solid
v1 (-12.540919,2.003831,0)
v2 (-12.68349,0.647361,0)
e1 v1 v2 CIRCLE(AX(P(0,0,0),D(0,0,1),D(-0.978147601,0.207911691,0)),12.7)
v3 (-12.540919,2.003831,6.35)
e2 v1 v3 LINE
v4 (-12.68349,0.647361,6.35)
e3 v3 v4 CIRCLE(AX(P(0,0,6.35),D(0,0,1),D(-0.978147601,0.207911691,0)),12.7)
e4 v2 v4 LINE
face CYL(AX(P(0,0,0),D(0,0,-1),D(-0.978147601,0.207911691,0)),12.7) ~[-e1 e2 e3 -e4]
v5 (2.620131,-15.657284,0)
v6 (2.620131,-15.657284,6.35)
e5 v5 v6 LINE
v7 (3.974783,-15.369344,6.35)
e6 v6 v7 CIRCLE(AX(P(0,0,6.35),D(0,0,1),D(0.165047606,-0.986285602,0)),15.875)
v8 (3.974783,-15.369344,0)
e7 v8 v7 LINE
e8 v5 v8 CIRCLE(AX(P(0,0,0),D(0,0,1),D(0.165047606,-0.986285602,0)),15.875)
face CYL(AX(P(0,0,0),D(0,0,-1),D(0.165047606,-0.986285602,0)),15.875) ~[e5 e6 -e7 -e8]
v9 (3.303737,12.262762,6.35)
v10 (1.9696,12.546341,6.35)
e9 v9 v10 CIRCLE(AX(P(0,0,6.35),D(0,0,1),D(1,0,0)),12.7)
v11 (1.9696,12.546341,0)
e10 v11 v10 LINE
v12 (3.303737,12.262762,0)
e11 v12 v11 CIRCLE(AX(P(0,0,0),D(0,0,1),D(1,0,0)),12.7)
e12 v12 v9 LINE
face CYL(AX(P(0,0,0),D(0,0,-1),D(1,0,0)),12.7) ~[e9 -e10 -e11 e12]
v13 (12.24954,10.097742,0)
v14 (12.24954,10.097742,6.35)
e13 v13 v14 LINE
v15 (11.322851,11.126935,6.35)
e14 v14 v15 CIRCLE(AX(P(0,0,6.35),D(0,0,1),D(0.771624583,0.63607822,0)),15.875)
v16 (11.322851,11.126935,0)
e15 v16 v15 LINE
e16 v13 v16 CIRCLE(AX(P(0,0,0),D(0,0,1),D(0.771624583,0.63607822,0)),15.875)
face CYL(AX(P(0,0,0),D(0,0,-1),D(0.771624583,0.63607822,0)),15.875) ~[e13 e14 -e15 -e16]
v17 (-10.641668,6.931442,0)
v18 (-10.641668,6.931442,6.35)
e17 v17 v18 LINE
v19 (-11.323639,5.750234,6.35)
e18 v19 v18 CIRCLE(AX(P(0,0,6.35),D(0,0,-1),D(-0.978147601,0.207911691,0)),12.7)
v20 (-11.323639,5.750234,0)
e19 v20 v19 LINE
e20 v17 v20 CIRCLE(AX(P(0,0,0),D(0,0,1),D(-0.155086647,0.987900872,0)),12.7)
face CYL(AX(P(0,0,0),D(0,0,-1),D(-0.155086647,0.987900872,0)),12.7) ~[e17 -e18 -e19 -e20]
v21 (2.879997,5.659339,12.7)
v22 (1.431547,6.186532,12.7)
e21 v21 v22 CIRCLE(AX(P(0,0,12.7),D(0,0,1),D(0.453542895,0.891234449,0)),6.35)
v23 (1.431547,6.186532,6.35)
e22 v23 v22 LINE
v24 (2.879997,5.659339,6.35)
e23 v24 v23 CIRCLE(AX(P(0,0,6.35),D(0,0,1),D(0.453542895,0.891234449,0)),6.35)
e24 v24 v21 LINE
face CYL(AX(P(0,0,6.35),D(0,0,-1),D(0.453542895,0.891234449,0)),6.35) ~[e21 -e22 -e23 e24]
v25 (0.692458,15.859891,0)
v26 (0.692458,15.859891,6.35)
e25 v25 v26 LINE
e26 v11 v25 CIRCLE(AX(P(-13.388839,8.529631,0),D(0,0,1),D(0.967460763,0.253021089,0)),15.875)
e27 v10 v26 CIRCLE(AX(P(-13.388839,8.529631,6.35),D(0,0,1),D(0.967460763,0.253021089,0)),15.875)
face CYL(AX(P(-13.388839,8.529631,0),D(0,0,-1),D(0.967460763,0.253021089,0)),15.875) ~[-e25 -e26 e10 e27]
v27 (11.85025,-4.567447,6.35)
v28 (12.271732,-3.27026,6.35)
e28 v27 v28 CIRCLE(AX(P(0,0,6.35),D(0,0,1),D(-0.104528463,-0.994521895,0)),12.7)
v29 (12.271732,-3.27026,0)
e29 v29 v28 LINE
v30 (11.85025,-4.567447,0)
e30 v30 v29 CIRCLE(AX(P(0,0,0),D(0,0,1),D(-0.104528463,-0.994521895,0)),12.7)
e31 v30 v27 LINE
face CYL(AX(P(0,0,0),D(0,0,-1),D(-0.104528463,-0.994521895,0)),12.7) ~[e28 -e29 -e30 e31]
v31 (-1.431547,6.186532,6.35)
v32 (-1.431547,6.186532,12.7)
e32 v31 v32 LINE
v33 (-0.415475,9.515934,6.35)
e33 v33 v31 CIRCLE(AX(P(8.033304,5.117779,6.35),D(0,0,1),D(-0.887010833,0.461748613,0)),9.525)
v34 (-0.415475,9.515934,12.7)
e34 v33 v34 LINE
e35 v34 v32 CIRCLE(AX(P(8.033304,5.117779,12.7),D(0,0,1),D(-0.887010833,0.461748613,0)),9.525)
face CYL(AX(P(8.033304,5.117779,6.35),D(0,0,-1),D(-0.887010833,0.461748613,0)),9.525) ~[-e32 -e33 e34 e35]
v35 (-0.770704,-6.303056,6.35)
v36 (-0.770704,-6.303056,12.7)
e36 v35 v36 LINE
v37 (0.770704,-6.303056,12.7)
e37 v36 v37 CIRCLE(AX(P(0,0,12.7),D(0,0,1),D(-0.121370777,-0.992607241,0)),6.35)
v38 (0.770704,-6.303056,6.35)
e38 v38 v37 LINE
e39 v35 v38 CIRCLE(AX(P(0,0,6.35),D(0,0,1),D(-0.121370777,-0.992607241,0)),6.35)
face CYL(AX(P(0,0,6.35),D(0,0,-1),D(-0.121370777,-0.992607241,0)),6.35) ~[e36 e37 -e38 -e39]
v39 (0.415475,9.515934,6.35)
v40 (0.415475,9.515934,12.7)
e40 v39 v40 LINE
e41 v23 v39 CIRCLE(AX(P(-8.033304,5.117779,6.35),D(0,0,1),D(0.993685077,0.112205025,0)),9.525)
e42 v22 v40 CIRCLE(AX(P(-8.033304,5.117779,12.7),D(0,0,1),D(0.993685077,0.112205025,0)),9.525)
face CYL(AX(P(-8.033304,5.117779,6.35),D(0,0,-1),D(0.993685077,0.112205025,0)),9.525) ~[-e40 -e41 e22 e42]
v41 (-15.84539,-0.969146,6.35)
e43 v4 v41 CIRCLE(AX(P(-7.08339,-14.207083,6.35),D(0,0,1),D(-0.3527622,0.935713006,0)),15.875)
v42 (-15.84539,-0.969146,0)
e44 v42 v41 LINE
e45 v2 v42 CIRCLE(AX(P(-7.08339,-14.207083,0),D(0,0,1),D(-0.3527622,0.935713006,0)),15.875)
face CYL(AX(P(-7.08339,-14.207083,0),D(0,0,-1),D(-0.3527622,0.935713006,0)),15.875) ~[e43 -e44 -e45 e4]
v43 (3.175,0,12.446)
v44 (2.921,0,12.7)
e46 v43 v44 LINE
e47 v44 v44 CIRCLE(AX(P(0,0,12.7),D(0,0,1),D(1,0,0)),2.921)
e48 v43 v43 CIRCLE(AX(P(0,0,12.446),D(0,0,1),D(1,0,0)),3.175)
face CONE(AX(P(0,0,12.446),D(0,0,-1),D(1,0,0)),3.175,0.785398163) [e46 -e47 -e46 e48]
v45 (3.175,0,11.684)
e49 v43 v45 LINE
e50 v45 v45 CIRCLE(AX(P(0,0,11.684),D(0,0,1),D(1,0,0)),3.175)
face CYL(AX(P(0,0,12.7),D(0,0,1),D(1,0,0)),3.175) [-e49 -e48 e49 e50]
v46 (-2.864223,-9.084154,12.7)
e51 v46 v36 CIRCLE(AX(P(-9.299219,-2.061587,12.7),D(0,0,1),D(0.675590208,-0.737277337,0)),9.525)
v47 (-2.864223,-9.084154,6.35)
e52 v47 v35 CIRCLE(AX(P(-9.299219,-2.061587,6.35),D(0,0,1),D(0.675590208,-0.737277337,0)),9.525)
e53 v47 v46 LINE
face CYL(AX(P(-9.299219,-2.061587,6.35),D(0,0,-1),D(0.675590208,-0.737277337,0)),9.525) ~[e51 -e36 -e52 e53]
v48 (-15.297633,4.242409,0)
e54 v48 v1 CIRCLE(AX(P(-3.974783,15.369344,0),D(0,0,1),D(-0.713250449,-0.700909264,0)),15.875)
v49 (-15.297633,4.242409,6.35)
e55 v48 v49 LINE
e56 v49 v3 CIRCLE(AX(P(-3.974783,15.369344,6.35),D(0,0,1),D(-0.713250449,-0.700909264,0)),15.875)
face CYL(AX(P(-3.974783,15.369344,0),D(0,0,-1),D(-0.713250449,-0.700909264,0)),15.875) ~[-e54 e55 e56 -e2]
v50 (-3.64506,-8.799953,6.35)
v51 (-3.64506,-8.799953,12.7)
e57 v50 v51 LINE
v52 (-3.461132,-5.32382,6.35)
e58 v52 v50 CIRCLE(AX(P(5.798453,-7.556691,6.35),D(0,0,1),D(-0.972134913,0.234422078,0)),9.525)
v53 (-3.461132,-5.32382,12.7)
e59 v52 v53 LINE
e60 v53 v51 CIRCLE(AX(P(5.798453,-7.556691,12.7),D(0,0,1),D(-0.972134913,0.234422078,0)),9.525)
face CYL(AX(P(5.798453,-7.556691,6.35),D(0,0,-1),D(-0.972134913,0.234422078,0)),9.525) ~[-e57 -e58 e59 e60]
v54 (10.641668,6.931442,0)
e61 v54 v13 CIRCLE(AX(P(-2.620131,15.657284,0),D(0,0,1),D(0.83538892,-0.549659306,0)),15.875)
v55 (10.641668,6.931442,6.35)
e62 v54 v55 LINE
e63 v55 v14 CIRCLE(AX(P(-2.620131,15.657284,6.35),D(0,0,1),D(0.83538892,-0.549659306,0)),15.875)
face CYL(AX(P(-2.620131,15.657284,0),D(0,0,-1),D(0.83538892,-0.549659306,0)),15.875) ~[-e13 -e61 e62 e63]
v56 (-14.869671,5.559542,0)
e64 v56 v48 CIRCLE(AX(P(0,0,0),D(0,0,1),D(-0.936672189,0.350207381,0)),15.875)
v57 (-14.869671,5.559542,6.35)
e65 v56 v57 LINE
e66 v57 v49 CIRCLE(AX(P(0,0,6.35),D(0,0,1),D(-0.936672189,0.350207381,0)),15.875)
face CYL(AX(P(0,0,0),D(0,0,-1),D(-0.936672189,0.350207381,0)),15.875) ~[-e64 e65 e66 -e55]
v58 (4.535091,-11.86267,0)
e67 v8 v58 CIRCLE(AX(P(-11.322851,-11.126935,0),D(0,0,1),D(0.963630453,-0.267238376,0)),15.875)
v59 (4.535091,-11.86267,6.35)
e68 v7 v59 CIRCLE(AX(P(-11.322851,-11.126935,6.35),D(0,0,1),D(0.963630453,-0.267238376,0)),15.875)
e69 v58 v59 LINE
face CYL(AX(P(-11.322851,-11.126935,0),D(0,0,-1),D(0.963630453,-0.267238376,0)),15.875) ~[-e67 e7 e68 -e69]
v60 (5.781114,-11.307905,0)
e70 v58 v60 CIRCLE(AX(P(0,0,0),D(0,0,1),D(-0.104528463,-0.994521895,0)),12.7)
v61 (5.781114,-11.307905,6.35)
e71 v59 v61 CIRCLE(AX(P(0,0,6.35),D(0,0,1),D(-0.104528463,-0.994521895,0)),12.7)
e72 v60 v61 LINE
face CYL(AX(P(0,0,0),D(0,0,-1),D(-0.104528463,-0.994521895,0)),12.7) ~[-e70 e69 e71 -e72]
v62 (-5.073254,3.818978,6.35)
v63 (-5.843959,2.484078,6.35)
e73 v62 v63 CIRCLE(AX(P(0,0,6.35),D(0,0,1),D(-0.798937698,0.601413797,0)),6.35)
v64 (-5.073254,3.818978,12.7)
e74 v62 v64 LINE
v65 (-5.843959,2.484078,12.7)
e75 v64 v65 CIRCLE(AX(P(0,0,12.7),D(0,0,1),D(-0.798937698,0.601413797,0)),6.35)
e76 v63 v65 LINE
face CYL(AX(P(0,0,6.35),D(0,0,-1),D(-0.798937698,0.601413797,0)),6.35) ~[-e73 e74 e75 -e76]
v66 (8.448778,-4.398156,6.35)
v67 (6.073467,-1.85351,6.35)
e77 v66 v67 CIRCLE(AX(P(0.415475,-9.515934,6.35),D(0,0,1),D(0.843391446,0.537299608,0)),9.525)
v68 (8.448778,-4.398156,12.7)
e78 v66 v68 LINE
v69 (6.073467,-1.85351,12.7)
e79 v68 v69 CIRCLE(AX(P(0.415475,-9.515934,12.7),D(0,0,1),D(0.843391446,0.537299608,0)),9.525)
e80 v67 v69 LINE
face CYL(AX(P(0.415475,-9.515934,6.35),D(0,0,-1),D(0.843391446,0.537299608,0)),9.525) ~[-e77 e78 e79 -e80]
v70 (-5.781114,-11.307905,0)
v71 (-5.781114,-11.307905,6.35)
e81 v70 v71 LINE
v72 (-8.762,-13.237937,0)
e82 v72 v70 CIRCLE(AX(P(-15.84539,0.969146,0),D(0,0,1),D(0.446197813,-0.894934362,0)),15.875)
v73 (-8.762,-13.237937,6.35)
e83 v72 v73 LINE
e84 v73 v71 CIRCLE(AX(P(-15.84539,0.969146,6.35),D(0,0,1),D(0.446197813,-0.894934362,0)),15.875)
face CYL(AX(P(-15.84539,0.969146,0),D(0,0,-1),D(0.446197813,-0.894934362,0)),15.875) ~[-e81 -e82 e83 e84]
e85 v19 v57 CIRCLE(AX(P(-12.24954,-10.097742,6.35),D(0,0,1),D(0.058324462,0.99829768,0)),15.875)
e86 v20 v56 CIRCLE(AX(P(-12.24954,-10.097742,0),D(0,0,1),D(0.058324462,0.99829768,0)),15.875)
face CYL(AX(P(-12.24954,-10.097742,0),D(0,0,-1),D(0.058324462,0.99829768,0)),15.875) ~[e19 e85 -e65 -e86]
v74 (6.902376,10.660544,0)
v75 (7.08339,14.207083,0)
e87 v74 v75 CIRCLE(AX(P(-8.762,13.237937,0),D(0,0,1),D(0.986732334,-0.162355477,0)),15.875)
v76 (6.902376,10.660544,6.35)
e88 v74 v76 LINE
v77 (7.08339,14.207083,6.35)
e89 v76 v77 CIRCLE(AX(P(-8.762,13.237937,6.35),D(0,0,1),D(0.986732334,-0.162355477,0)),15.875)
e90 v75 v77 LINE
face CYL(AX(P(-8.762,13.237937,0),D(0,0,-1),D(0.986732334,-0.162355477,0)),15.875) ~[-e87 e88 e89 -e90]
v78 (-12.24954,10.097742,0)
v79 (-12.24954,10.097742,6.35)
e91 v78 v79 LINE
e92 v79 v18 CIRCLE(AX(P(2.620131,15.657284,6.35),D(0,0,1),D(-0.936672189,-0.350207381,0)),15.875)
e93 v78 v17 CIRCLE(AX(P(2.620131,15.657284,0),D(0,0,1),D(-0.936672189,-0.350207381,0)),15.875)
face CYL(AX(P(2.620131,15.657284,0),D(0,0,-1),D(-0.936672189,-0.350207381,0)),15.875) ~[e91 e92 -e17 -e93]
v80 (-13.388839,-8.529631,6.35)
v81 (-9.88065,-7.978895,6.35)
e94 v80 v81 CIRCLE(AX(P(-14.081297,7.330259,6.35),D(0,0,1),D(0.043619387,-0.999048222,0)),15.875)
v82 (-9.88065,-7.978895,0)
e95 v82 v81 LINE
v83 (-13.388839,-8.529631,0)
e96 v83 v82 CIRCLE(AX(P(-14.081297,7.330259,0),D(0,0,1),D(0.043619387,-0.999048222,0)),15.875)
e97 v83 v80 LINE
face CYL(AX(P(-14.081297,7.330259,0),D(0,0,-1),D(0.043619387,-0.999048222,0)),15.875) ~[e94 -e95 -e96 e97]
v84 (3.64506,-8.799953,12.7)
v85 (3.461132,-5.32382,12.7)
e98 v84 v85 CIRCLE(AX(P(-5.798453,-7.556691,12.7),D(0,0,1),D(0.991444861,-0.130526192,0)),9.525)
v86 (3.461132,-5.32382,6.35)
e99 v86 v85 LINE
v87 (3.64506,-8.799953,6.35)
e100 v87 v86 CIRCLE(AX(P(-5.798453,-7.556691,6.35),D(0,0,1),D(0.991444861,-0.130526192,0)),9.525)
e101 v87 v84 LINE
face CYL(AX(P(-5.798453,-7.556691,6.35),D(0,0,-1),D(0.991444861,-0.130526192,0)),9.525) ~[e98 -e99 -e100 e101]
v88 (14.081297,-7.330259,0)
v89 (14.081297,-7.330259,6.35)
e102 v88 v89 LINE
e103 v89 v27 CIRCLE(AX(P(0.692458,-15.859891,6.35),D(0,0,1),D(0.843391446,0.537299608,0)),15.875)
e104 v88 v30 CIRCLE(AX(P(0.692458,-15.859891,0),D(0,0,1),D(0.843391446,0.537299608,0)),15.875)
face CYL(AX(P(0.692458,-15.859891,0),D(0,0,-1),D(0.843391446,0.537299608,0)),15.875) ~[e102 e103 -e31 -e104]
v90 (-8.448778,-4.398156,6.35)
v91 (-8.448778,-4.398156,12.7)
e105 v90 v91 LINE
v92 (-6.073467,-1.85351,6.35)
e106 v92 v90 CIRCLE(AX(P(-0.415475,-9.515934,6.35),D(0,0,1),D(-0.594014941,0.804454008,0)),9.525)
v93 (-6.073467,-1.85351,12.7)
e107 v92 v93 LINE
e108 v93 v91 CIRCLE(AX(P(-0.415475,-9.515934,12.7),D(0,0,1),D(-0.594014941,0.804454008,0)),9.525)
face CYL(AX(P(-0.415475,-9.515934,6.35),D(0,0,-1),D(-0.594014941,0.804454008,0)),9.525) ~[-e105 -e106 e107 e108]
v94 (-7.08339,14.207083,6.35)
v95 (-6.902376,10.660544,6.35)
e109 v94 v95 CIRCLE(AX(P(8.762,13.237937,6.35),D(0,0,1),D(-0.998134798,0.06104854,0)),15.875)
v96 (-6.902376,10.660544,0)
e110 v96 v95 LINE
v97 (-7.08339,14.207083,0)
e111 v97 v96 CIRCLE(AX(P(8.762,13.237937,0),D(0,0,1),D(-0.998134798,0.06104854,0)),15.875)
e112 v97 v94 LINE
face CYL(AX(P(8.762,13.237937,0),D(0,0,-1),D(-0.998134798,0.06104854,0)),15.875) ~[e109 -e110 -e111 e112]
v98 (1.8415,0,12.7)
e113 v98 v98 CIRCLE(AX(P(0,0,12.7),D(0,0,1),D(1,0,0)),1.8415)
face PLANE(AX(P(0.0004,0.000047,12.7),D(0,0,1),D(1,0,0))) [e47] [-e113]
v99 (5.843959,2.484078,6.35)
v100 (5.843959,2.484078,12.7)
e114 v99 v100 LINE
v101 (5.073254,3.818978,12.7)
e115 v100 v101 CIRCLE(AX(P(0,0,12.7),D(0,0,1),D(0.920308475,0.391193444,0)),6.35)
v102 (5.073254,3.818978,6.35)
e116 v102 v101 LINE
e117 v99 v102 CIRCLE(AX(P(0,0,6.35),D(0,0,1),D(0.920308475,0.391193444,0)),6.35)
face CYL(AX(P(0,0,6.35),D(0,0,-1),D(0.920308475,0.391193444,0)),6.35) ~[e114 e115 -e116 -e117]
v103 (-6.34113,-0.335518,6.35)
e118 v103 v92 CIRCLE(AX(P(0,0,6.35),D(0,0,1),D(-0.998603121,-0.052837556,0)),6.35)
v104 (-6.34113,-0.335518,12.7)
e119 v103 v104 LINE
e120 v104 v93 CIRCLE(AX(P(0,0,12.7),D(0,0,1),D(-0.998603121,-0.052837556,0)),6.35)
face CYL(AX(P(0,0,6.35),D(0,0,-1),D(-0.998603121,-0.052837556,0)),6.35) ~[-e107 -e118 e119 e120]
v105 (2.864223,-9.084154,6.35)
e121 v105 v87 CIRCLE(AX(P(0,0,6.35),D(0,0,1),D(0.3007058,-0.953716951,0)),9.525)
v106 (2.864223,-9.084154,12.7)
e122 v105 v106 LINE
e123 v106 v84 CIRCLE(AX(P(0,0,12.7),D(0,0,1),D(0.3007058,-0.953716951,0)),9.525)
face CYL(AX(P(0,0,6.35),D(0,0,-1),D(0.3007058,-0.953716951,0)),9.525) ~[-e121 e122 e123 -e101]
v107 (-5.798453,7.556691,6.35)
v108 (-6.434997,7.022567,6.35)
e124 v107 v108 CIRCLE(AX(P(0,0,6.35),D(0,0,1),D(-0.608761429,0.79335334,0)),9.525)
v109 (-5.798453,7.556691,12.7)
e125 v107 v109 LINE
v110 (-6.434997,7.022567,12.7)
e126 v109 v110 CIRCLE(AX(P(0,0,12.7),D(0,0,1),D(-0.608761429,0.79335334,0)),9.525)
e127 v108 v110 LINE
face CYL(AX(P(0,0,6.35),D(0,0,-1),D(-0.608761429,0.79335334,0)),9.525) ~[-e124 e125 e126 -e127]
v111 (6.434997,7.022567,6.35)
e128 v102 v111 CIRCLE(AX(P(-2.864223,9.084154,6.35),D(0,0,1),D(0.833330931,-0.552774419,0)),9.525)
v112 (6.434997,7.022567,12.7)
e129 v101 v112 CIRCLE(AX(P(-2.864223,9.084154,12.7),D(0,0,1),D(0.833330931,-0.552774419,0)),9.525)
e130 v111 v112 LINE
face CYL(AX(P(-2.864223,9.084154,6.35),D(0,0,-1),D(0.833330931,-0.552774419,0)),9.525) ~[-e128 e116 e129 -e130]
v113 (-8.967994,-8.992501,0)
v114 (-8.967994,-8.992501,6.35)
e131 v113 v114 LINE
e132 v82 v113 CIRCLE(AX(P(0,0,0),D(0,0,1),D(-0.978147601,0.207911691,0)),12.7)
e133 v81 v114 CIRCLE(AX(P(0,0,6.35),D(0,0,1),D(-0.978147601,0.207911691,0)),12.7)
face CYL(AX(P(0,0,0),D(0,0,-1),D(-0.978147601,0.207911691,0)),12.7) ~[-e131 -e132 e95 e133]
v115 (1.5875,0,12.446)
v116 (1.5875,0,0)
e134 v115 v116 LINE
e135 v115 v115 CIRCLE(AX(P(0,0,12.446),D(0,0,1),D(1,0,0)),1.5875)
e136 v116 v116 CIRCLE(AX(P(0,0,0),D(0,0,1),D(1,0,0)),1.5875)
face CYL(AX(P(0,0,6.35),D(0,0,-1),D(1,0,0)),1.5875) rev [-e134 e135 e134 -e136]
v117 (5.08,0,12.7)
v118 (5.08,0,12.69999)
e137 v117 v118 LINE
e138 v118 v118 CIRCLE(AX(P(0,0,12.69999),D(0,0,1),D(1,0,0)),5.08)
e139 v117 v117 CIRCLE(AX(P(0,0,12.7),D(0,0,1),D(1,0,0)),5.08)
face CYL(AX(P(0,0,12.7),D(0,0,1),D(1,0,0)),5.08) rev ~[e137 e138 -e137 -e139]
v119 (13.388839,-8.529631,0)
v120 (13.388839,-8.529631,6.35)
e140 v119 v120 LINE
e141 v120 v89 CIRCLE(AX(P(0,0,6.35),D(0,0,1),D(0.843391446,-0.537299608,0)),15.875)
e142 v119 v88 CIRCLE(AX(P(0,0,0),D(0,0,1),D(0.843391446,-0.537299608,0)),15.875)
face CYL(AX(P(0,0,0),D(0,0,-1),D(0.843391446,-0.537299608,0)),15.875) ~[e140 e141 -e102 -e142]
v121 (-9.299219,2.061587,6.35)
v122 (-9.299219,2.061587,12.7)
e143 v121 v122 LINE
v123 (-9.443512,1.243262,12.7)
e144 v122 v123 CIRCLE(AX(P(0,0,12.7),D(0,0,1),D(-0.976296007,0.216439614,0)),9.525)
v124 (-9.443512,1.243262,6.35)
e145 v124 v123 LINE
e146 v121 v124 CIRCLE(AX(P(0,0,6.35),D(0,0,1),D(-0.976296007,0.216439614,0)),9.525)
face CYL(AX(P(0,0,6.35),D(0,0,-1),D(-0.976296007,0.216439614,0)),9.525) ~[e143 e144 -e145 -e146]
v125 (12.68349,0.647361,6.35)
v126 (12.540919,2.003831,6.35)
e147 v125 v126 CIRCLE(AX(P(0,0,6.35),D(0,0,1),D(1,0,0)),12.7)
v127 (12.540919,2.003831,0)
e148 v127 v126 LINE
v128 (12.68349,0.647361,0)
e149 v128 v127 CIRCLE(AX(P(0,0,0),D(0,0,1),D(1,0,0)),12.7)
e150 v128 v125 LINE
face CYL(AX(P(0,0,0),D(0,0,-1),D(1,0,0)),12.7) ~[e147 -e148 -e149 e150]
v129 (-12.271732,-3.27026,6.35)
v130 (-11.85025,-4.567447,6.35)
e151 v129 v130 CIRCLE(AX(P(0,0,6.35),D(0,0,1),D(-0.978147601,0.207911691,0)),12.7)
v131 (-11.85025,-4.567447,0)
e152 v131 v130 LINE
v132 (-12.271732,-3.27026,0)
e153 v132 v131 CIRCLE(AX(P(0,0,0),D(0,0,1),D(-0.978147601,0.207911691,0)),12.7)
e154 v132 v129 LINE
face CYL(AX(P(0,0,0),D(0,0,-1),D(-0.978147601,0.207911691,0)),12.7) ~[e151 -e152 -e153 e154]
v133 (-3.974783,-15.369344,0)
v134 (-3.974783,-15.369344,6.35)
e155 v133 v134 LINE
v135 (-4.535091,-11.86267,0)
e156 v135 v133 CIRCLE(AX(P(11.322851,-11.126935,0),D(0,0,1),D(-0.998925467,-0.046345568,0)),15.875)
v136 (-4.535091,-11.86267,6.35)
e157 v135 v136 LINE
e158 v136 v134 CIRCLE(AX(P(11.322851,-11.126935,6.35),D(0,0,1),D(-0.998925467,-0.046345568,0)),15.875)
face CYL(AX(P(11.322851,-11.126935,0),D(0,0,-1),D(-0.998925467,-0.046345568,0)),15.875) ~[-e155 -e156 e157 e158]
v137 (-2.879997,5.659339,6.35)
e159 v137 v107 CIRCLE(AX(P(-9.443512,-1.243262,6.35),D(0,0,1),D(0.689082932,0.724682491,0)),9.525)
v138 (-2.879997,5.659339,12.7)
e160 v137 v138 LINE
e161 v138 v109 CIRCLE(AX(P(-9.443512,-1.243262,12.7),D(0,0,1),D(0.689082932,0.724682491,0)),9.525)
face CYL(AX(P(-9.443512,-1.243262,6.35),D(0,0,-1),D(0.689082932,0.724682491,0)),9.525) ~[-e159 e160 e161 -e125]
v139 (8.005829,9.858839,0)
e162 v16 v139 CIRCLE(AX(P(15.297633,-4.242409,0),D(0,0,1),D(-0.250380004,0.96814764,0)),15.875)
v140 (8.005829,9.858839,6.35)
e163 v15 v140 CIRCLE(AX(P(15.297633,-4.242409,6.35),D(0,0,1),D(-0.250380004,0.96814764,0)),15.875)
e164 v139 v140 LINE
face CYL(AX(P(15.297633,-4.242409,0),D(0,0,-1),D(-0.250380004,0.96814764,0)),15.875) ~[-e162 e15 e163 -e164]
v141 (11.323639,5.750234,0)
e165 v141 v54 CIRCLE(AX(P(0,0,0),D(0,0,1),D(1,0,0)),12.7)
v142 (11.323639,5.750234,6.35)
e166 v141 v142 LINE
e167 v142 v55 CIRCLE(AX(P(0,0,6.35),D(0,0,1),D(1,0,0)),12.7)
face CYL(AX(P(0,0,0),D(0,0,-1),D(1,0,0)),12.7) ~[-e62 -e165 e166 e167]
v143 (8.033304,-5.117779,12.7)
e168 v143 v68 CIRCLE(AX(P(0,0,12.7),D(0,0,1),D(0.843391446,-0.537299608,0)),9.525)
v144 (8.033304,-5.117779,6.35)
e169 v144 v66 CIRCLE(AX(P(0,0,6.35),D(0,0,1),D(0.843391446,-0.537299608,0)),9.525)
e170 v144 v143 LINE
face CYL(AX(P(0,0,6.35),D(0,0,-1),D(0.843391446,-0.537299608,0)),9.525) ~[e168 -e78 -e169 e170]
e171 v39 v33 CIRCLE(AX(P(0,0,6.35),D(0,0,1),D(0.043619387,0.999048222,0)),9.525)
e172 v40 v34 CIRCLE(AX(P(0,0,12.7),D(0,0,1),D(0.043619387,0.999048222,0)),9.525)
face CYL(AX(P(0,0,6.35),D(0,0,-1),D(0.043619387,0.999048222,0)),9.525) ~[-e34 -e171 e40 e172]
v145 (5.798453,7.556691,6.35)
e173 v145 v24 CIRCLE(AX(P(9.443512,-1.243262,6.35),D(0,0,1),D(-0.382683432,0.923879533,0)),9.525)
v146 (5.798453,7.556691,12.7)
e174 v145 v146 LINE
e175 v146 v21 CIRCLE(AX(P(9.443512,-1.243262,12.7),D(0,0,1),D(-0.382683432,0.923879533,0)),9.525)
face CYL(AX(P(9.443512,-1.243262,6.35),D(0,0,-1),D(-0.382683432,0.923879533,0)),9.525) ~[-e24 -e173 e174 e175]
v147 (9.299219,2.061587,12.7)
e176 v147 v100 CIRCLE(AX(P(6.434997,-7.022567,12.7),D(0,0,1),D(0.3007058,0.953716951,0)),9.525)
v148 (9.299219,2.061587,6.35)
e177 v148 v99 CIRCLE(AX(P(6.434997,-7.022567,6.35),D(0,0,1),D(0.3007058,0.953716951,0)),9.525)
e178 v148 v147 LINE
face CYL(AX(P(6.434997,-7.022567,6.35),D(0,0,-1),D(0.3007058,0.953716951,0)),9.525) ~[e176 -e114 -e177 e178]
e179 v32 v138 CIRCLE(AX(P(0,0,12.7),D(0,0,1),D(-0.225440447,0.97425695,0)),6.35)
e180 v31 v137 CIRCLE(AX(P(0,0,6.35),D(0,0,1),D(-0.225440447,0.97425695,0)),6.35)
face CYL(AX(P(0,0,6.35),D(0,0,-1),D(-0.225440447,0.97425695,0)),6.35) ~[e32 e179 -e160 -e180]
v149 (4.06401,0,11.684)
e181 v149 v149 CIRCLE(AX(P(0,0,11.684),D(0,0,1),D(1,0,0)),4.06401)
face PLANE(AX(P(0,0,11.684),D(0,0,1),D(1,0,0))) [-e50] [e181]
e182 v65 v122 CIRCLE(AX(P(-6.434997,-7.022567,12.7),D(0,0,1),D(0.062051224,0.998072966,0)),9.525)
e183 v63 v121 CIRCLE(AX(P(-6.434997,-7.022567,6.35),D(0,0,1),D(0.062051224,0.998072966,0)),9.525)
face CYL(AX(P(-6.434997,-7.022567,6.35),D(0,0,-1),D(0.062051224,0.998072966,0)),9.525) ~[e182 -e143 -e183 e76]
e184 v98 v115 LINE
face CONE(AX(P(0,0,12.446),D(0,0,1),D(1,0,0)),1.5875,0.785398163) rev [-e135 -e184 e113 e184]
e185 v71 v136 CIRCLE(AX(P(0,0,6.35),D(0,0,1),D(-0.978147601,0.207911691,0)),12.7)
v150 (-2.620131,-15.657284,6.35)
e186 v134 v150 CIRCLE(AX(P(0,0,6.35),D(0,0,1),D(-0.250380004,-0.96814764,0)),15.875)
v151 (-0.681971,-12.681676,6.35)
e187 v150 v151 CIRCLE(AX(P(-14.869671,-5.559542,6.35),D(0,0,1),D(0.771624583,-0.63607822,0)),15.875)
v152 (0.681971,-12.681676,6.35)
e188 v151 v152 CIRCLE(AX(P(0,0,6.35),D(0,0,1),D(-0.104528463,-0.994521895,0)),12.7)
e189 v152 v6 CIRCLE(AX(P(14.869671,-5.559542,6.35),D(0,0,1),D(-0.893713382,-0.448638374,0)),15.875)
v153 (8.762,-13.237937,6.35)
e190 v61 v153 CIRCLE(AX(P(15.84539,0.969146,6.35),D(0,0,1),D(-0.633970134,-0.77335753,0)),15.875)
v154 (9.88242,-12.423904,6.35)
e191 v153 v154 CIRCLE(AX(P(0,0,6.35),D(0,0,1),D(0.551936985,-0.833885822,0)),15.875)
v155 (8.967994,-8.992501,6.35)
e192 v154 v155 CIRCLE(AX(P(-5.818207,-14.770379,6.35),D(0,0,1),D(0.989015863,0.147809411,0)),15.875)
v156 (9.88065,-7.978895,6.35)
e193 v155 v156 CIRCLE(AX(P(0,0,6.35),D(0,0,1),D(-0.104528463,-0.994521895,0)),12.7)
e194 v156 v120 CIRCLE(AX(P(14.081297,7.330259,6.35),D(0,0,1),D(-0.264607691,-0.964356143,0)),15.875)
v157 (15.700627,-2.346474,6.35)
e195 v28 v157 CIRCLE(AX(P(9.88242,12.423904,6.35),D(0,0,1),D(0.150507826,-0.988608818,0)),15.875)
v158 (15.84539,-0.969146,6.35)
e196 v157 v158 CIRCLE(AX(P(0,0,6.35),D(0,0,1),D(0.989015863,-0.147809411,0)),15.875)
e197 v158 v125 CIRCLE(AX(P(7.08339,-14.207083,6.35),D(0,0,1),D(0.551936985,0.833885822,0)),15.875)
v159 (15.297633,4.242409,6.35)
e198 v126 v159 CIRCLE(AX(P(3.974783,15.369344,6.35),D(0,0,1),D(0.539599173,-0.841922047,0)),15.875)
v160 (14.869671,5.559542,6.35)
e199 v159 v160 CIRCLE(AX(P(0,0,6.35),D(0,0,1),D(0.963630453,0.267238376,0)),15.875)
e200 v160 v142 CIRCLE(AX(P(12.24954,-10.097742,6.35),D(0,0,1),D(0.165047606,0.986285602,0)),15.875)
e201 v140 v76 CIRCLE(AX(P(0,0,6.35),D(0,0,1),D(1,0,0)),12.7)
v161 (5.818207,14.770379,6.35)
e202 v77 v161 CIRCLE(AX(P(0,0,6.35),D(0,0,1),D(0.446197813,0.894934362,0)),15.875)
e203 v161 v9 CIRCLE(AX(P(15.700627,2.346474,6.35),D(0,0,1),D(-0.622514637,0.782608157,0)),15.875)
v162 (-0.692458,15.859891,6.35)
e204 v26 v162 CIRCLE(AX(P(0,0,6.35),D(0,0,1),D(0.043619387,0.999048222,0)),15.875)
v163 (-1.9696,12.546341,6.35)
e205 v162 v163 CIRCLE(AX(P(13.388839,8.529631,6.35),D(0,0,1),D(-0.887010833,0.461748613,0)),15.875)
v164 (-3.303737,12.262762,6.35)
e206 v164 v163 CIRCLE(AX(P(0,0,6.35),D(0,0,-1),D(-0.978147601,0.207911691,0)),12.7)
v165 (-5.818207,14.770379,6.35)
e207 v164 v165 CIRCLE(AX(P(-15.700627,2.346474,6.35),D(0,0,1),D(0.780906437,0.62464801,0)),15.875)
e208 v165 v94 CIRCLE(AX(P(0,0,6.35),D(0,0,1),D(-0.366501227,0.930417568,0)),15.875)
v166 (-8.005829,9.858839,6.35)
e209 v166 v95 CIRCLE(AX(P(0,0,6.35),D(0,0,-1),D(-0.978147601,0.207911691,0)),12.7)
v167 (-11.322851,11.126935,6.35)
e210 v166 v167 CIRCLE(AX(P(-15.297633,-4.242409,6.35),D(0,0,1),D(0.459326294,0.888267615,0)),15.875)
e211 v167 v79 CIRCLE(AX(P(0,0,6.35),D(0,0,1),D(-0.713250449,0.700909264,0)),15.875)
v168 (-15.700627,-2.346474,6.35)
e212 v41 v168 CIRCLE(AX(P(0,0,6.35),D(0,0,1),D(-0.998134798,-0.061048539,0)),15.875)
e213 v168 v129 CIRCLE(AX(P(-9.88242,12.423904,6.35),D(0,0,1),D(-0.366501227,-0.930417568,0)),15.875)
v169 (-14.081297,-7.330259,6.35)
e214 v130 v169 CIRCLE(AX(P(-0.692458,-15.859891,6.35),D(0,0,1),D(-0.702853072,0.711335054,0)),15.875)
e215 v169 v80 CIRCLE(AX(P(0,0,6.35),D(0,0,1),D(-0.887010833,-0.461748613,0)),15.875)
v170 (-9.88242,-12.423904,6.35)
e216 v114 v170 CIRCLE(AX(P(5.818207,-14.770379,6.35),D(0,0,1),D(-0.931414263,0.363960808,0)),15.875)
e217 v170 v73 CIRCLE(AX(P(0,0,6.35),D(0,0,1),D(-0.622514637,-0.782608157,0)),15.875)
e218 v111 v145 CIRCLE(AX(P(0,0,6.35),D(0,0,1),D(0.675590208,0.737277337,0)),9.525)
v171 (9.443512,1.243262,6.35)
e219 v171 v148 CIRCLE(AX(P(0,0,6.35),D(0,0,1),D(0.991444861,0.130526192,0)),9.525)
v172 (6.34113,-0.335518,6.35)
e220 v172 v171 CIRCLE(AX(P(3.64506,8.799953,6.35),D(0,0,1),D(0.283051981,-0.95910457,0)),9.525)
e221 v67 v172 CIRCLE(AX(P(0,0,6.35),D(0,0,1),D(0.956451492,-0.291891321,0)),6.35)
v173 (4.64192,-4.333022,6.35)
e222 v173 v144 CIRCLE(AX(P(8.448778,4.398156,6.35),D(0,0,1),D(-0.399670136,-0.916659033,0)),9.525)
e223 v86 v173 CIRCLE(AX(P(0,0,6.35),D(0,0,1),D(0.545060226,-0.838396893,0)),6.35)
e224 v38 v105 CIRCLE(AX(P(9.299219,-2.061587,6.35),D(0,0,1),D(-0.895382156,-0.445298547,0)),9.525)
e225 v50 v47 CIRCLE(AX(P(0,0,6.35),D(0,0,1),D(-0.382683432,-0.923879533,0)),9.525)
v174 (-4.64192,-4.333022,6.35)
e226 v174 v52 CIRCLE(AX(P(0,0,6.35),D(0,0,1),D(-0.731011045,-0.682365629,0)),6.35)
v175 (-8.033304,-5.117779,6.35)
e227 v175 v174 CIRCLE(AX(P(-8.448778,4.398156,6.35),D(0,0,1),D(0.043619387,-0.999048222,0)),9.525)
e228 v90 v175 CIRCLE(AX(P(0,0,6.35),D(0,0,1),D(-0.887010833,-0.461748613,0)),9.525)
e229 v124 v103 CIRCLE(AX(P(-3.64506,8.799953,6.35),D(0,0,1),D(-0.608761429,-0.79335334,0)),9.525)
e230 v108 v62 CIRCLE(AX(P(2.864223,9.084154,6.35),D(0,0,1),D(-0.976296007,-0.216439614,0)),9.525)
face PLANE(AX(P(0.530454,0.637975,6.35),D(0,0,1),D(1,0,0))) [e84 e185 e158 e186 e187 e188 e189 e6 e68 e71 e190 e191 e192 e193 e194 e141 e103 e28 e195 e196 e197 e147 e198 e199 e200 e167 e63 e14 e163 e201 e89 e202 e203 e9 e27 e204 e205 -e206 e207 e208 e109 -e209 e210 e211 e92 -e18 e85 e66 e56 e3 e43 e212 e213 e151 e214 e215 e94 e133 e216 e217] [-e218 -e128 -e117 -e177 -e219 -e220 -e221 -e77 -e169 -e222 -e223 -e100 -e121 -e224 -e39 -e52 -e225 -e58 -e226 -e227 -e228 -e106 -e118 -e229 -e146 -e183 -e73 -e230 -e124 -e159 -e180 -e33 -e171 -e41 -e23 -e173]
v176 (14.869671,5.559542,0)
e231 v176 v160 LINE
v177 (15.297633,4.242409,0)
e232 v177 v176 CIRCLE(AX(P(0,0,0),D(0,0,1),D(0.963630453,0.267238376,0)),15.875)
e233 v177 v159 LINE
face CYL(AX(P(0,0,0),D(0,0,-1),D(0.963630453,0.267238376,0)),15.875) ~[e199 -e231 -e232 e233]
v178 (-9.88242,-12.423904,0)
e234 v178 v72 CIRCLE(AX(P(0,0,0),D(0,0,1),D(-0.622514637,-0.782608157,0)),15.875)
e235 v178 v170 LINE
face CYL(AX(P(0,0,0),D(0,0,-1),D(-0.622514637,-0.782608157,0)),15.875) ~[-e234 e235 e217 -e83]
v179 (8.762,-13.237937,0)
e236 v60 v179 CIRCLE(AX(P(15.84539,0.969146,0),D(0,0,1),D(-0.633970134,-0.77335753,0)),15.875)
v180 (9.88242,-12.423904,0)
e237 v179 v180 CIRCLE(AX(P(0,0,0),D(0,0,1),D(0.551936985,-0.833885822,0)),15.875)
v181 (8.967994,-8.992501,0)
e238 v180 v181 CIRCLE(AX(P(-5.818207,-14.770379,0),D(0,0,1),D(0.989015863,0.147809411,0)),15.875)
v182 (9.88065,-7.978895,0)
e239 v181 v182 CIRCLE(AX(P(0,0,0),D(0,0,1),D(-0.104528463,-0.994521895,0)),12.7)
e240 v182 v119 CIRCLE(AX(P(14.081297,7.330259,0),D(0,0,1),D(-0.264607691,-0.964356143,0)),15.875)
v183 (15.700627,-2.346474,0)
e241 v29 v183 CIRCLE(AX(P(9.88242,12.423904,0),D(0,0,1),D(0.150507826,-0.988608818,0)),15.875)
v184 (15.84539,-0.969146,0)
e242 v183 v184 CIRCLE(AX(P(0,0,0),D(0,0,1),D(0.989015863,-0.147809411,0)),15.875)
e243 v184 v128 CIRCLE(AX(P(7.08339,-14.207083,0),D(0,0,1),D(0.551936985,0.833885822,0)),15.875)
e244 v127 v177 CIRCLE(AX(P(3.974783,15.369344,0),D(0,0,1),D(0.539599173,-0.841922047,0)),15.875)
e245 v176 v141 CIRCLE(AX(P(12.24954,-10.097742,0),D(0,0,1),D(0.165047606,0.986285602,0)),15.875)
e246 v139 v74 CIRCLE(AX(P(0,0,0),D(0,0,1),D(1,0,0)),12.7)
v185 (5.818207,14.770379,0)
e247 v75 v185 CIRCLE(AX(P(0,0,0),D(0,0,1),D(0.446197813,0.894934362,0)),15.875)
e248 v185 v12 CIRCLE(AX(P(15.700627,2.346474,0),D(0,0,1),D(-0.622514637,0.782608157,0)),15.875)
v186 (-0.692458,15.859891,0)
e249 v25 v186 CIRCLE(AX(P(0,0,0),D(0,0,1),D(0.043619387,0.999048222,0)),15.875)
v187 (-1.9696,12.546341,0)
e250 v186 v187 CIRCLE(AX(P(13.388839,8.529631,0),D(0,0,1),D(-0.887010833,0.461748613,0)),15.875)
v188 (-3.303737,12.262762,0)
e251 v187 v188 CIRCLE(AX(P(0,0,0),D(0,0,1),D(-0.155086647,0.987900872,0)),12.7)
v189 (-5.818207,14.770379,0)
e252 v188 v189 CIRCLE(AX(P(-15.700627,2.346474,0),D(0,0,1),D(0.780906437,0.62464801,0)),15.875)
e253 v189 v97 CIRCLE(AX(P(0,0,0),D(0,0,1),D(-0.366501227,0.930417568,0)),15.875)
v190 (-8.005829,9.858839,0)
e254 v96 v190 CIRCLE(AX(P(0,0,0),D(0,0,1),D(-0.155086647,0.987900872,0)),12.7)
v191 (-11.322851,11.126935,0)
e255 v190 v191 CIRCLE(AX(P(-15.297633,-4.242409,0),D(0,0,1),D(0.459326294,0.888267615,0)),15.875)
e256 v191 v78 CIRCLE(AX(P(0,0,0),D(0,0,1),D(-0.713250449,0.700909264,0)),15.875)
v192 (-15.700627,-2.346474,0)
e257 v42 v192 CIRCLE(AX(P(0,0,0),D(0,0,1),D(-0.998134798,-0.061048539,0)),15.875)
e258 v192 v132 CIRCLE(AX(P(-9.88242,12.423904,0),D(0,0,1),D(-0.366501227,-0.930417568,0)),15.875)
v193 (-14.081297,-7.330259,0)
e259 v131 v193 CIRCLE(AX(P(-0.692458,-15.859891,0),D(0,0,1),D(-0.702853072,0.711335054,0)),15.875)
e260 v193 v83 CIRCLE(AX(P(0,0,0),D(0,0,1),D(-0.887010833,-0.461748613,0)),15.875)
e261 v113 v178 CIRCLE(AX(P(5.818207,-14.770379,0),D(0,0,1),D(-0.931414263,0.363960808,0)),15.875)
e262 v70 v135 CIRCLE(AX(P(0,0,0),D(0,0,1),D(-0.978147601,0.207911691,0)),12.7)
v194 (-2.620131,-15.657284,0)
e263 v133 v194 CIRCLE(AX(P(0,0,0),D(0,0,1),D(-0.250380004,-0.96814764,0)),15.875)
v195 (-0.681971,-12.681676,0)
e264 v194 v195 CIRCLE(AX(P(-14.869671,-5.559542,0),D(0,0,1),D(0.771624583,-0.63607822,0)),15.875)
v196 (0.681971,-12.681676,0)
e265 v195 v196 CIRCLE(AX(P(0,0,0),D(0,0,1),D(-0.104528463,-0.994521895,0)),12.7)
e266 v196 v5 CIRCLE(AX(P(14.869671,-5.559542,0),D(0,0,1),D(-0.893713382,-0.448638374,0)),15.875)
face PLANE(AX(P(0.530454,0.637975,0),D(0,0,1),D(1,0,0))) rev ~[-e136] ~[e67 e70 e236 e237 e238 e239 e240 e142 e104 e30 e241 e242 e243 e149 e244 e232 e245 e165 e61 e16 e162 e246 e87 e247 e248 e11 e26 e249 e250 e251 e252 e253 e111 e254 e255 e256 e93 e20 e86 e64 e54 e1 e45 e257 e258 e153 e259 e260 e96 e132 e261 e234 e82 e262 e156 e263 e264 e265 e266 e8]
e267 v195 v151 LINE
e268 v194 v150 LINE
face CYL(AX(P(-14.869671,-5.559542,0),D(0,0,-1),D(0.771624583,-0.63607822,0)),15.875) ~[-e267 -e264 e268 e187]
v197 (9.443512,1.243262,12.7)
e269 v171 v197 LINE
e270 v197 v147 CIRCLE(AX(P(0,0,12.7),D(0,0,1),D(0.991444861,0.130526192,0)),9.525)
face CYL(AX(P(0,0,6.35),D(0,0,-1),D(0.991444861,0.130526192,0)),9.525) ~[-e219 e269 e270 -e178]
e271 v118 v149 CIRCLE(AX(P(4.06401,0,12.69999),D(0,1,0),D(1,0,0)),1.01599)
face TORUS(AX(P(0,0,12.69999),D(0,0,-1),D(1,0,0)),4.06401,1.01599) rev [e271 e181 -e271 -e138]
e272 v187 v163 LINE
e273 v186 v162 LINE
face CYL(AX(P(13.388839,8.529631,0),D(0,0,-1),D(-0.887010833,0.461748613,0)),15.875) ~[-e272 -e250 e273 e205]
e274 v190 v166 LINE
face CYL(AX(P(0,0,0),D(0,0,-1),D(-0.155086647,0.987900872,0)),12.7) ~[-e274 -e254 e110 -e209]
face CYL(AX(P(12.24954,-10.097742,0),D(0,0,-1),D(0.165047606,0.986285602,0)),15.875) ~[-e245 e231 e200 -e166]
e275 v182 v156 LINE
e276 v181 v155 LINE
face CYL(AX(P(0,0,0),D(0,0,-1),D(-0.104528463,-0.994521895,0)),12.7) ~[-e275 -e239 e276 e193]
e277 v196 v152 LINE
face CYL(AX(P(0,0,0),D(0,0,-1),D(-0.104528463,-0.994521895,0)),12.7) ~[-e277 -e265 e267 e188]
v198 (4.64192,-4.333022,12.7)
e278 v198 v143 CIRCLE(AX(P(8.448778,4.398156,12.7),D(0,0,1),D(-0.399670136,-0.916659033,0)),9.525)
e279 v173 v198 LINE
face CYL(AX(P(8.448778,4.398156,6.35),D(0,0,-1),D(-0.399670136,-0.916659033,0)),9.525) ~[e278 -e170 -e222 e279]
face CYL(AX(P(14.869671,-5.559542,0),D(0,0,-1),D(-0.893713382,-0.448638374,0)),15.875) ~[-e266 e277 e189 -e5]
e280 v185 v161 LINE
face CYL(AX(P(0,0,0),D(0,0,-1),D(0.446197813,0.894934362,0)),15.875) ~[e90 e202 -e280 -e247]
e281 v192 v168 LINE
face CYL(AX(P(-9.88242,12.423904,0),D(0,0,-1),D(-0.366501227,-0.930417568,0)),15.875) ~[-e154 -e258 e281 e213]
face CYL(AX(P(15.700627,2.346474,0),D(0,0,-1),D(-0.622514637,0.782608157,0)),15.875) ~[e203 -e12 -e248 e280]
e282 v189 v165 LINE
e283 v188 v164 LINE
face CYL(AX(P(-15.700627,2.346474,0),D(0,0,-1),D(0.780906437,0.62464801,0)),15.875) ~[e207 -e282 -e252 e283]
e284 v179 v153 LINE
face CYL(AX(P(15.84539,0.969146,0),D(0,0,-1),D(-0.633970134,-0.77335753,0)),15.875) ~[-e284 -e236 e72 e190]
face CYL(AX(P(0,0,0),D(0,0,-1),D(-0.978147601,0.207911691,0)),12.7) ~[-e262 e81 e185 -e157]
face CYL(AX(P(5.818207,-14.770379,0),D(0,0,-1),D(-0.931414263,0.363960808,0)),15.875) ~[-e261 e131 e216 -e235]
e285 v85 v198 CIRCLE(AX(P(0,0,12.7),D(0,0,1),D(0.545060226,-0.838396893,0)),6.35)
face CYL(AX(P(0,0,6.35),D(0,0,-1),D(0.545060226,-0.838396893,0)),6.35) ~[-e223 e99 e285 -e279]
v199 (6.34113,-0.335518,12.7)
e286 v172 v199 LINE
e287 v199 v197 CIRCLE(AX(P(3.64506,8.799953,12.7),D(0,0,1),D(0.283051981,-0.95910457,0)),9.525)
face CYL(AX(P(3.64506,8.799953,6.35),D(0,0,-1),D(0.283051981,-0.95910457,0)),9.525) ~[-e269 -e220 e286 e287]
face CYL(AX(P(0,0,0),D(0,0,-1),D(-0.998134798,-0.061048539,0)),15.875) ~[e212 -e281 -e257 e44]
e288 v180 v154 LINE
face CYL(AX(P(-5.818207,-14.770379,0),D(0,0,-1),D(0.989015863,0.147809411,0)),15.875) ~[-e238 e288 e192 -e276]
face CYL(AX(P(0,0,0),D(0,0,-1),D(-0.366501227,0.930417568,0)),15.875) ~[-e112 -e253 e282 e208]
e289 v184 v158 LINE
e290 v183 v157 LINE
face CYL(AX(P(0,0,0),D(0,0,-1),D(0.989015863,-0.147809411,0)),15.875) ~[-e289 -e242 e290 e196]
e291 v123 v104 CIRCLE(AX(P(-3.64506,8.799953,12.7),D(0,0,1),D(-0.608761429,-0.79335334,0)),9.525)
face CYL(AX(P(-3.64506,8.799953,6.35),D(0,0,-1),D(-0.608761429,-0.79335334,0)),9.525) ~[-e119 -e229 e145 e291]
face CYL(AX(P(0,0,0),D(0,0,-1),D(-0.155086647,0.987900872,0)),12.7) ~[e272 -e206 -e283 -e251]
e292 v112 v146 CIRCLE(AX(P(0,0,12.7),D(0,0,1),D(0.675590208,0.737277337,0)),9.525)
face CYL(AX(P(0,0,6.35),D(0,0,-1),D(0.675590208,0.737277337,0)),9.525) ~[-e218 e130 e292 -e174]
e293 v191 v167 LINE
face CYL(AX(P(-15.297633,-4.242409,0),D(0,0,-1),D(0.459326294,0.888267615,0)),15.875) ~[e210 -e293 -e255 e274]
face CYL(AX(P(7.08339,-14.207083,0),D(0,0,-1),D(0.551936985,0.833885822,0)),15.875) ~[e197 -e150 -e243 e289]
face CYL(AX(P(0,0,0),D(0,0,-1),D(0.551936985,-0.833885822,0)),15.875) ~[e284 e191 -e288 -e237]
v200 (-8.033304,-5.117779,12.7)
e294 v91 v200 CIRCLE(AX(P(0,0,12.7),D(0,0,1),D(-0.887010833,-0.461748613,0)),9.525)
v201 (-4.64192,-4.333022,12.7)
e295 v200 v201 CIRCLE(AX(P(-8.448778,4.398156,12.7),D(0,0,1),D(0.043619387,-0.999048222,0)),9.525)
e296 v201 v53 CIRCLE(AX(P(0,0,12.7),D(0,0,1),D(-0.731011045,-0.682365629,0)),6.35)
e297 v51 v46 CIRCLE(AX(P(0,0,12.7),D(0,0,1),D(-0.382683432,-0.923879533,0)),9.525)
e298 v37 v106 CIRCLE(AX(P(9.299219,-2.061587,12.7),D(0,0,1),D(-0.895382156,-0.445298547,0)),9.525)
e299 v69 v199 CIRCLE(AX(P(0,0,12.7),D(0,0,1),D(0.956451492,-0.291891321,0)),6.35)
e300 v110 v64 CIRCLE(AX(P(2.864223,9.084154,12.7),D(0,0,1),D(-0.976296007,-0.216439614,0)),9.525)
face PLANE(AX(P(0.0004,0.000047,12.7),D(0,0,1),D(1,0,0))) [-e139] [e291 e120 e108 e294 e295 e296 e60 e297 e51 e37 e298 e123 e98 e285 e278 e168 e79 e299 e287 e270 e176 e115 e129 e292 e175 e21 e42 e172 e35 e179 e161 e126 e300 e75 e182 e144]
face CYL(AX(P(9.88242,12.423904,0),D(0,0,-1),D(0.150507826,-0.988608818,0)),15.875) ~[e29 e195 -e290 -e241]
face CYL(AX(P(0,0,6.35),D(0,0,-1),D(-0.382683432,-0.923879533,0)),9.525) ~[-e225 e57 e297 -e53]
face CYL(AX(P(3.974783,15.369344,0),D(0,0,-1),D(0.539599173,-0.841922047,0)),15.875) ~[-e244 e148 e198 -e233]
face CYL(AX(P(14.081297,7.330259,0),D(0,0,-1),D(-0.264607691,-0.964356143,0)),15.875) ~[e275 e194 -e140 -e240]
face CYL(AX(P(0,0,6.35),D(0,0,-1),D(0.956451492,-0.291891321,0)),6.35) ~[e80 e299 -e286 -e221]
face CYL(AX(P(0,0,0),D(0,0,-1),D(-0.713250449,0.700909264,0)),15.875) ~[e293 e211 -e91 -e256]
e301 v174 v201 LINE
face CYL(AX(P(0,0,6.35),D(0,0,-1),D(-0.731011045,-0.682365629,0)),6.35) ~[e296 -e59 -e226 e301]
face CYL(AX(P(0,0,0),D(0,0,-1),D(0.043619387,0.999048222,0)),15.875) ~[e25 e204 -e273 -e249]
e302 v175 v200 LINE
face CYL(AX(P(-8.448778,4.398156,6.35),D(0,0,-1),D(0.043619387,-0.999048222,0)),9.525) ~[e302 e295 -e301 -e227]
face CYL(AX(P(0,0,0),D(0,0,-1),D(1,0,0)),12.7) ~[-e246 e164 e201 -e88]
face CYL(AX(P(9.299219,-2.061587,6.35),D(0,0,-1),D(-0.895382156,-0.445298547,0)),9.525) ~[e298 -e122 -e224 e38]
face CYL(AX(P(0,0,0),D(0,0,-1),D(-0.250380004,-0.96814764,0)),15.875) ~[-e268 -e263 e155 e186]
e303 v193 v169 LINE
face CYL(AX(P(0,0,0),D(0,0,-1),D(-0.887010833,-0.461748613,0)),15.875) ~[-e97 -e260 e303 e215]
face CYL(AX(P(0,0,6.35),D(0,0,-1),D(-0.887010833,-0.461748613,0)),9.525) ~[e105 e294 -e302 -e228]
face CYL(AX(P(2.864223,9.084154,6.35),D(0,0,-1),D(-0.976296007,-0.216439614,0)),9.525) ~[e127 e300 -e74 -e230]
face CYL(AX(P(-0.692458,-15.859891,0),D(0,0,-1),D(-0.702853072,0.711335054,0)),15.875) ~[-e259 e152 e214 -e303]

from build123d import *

# Parameters (mm, degrees)
F0_R     = 4.7625
F0_R_2   = 1.5875
F1_DEPTH = 6.35
F2_COUNT = 15
F3_R     = 4.7625
F3_R_2   = 3.175
F3_R_3   = 1.5875
F4_DEPTH = 6.35
F5_R     = 5.08
F5_R_2   = 3.175
F6_DEPTH = 1.016
F7_R     = 1.01599
F8_SIZE  = 0.254


# Not quite as in the source:
# - a fillet or chamfer is up to 0.001 mm smaller than in the source, because OpenCascade refuses the exact size


with BuildPart() as f1:
    # F0 (on Top) → F1 (new body)
    with BuildSketch(Plane.XY):
        with BuildLine():
            ThreePointArc((-1.9696004156, 12.5463410683), (-8.2545767524, -9.6515264409), (12.7, 0))
            ThreePointArc((12.7, 0), (9.6515264409, 8.2545767524), (1.9696004156, 12.5463410683))
            ThreePointArc((1.9696004156, 12.5463410683), (0, 12.7), (-1.9696004156, 12.5463410683))
        make_face()
        Circle(F0_R, mode=Mode.SUBTRACT)
        with BuildLine():
            ThreePointArc((-1.9696004156, 12.5463410683), (0, 12.7), (1.9696004156, 12.5463410683))
            ThreePointArc((1.9696004156, 12.5463410683), (1.4239736696, 14.2389394562), (0.6924577744, 15.8598905176))
            ThreePointArc((0.6924577744, 15.8598905176), (0, 15.875), (-0.6924577744, 15.8598905176))
            ThreePointArc((-0.6924577744, 15.8598905176), (-1.4239736696, 14.2389394562), (-1.9696004156, 12.5463410683))
        make_face()
        Circle(F0_R)
        Circle(F0_R_2, mode=Mode.SUBTRACT)
    extrude(amount=F1_DEPTH)

    # F2: F1 ×15 about axis
    f2_axis = Axis((0, 0, 0), (0, 0, -1))


with BuildPart() as f1_1:
    add(f1.part)
    for i in range(1, F2_COUNT):
        add(f1.part.rotate(f2_axis, i * 360 / F2_COUNT))

    # F3 (on face) → F4 (join)
    with BuildSketch(Plane.XY.offset(6.35)):
        with BuildLine():
            ThreePointArc((6.3411298165, -0.3355184801), (6.3477820668, -0.1678178556), (6.35, 0))
            ThreePointArc((6.35, 0), (6.222203729, 1.2675491134), (5.8439588173, 2.4840783686))
            ThreePointArc((5.8439588173, 2.4840783686), (5.499261314, 3.175), (5.0732543809, 3.8189776102))
            ThreePointArc((5.0732543809, 3.8189776102), (4.0817013215, 4.8643822138), (2.879997381, 5.6593387498))
            ThreePointArc((2.879997381, 5.6593387498), (2.1718279101, 5.967048142), (1.4315468375, 6.1865316335))
            ThreePointArc((1.4315468375, 6.1865316335), (0, 6.35), (-1.4315468375, 6.1865316335))
            ThreePointArc((-1.4315468375, 6.1865316335), (-2.1718279101, 5.967048142), (-2.879997381, 5.6593387498))
            ThreePointArc((-2.879997381, 5.6593387498), (-4.0817013215, 4.8643822138), (-5.0732543809, 3.8189776102))
            ThreePointArc((-5.0732543809, 3.8189776102), (-5.499261314, 3.175), (-5.8439588173, 2.4840783686))
            ThreePointArc((-5.8439588173, 2.4840783686), (-6.2535292316, 1.1026659282), (-6.3411298165, -0.3355184801))
            ThreePointArc((-6.3411298165, -0.3355184801), (-6.2535292316, -1.1026659282), (-6.0734669747, -1.8535098888))
            ThreePointArc((-6.0734669747, -1.8535098888), (-5.499261314, -3.175), (-4.6419201372, -4.3330217447))
            ThreePointArc((-4.6419201372, -4.3330217447), (-4.0817013215, -4.8643822138), (-3.4611324355, -5.3238202697))
            ThreePointArc((-3.4611324355, -5.3238202697), (-2.1718279101, -5.967048142), (-0.7707044365, -6.3030559788))
            ThreePointArc((-0.7707044365, -6.3030559788), (0, -6.35), (0.7707044365, -6.3030559788))
            ThreePointArc((0.7707044365, -6.3030559788), (2.1718279101, -5.967048142), (3.4611324355, -5.3238202697))
            ThreePointArc((3.4611324355, -5.3238202697), (4.0817013215, -4.8643822138), (4.6419201372, -4.3330217447))
            ThreePointArc((4.6419201372, -4.3330217447), (5.499261314, -3.175), (6.0734669747, -1.8535098888))
            ThreePointArc((6.0734669747, -1.8535098888), (6.2535292316, -1.1026659282), (6.3411298165, -0.3355184801))
        make_face()
        Circle(F3_R, mode=Mode.SUBTRACT)
        with BuildLine():
            ThreePointArc((5.8439588173, 2.4840783686), (6.222203729, 1.2675491134), (6.35, 0))
            ThreePointArc((6.35, 0), (6.3477820668, -0.1678178556), (6.3411298165, -0.3355184801))
            ThreePointArc((6.3411298165, -0.3355184801), (7.9650557648, 0.3109444224), (9.4435123046, 1.2432619809))
            ThreePointArc((9.4435123046, 1.2432619809), (9.3802938474, 1.6539988923), (9.2992194678, 2.0615873228))
            ThreePointArc((9.2992194678, 2.0615873228), (7.5910533822, 2.4320173351), (5.8439588173, 2.4840783686))
        make_face()
        with BuildLine():
            ThreePointArc((2.879997381, 5.6593387498), (4.0817013215, 4.8643822138), (5.0732543809, 3.8189776102))
            ThreePointArc((5.0732543809, 3.8189776102), (5.9017154857, 5.358036403), (6.4349967275, 7.0225666331))
            ThreePointArc((6.4349967275, 7.0225666331), (6.1225519823, 7.2965733207), (5.7984526113, 7.5566905663))
            ThreePointArc((5.7984526113, 7.5566905663), (4.2518136514, 6.7424684237), (2.879997381, 5.6593387498))
        make_face()
        with BuildLine():
            ThreePointArc((8.448778186, -4.3981555411), (7.3783548704, -3.0164016935), (6.0734669747, -1.8535098888))
            ThreePointArc((6.0734669747, -1.8535098888), (5.499261314, -3.175), (4.6419201372, -4.3330217447))
            ThreePointArc((4.6419201372, -4.3330217447), (6.3014579298, -4.8816419092), (8.0333035214, -5.1177787695))
            ThreePointArc((8.0333035214, -5.1177787695), (8.248891971, -4.7625), (8.448778186, -4.3981555411))
        make_face()
        with BuildLine():
            ThreePointArc((-1.4315468375, 6.1865316335), (0, 6.35), (1.4315468375, 6.1865316335))
            ThreePointArc((1.4315468375, 6.1865316335), (1.0768969406, 7.8980436026), (0.4154746647, 9.5159343106))
            ThreePointArc((0.4154746647, 9.5159343106), (0, 9.525), (-0.4154746647, 9.5159343106))
            ThreePointArc((-0.4154746647, 9.5159343106), (-1.0768969406, 7.8980436026), (-1.4315468375, 6.1865316335))
        make_face()
        with BuildLine():
            ThreePointArc((3.6450596933, -8.7999525472), (3.7132421134, -7.0534128461), (3.4611324355, -5.3238202697))
            ThreePointArc((3.4611324355, -5.3238202697), (2.1718279101, -5.967048142), (0.7707044365, -6.3030559788))
            ThreePointArc((0.7707044365, -6.3030559788), (1.6893378965, -7.790053738), (2.8642227403, -9.0841539559))
            ThreePointArc((2.8642227403, -9.0841539559), (3.2577418652, -8.950572213), (3.6450596933, -8.7999525472))
        make_face()
        with BuildLine():
            ThreePointArc((-5.0732543809, 3.8189776102), (-4.0817013215, 4.8643822138), (-2.879997381, 5.6593387498))
            ThreePointArc((-2.879997381, 5.6593387498), (-4.2518136514, 6.7424684237), (-5.7984526113, 7.5566905663))
            ThreePointArc((-5.7984526113, 7.5566905663), (-6.1225519823, 7.2965733207), (-6.4349967275, 7.0225666331))
            ThreePointArc((-6.4349967275, 7.0225666331), (-5.9017154857, 5.358036403), (-5.0732543809, 3.8189776102))
        make_face()
        with BuildLine():
            ThreePointArc((-2.8642227403, -9.0841539559), (-1.6893378965, -7.790053738), (-0.7707044365, -6.3030559788))
            ThreePointArc((-0.7707044365, -6.3030559788), (-2.1718279101, -5.967048142), (-3.4611324355, -5.3238202697))
            ThreePointArc((-3.4611324355, -5.3238202697), (-3.7132421134, -7.0534128461), (-3.6450596933, -8.7999525472))
            ThreePointArc((-3.6450596933, -8.7999525472), (-3.2577418652, -8.950572213), (-2.8642227403, -9.0841539559))
        make_face()
        with BuildLine():
            ThreePointArc((-6.3411298165, -0.3355184801), (-6.2535292316, 1.1026659282), (-5.8439588173, 2.4840783686))
            ThreePointArc((-5.8439588173, 2.4840783686), (-7.5910533822, 2.4320173351), (-9.2992194678, 2.0615873228))
            ThreePointArc((-9.2992194678, 2.0615873228), (-9.3802938474, 1.6539988923), (-9.4435123046, 1.2432619809))
            ThreePointArc((-9.4435123046, 1.2432619809), (-7.9650557648, 0.3109444224), (-6.3411298165, -0.3355184801))
        make_face()
        with BuildLine():
            ThreePointArc((-8.0333035214, -5.1177787695), (-6.3014579298, -4.8816419092), (-4.6419201372, -4.3330217447))
            ThreePointArc((-4.6419201372, -4.3330217447), (-5.499261314, -3.175), (-6.0734669747, -1.8535098888))
            ThreePointArc((-6.0734669747, -1.8535098888), (-7.3783548704, -3.0164016935), (-8.448778186, -4.3981555411))
            ThreePointArc((-8.448778186, -4.3981555411), (-8.248891971, -4.7625), (-8.0333035214, -5.1177787695))
        make_face()
        Circle(F3_R)
        Circle(F3_R_2, mode=Mode.SUBTRACT)
        Circle(F3_R_2)
        Circle(F3_R_3, mode=Mode.SUBTRACT)
    extrude(amount=F4_DEPTH)

    # F5 (on face) → F6 (cut)
    with BuildSketch(Plane.XY.offset(12.7)):
        Circle(F5_R)
        Circle(F5_R_2, mode=Mode.SUBTRACT)
    extrude(amount=-F6_DEPTH, mode=Mode.SUBTRACT)

    # F7 (radius 1.016 in the source; OpenCascade refuses exactly that, so slightly less here)
    f7_edges = [f1_1.edges().sort_by_distance(p)[0] for p in [
        (-5.08, 0, 11.684),
    ]]
    fillet(f7_edges, radius=F7_R)

    # F8
    f8_edges = [f1_1.edges().sort_by_distance(p)[0] for p in [
        (-1.5875, 0, 12.7),
        (-3.175, 0, 12.7),
    ]]
    chamfer(f8_edges, length=F8_SIZE)


solid = f1_1.part
